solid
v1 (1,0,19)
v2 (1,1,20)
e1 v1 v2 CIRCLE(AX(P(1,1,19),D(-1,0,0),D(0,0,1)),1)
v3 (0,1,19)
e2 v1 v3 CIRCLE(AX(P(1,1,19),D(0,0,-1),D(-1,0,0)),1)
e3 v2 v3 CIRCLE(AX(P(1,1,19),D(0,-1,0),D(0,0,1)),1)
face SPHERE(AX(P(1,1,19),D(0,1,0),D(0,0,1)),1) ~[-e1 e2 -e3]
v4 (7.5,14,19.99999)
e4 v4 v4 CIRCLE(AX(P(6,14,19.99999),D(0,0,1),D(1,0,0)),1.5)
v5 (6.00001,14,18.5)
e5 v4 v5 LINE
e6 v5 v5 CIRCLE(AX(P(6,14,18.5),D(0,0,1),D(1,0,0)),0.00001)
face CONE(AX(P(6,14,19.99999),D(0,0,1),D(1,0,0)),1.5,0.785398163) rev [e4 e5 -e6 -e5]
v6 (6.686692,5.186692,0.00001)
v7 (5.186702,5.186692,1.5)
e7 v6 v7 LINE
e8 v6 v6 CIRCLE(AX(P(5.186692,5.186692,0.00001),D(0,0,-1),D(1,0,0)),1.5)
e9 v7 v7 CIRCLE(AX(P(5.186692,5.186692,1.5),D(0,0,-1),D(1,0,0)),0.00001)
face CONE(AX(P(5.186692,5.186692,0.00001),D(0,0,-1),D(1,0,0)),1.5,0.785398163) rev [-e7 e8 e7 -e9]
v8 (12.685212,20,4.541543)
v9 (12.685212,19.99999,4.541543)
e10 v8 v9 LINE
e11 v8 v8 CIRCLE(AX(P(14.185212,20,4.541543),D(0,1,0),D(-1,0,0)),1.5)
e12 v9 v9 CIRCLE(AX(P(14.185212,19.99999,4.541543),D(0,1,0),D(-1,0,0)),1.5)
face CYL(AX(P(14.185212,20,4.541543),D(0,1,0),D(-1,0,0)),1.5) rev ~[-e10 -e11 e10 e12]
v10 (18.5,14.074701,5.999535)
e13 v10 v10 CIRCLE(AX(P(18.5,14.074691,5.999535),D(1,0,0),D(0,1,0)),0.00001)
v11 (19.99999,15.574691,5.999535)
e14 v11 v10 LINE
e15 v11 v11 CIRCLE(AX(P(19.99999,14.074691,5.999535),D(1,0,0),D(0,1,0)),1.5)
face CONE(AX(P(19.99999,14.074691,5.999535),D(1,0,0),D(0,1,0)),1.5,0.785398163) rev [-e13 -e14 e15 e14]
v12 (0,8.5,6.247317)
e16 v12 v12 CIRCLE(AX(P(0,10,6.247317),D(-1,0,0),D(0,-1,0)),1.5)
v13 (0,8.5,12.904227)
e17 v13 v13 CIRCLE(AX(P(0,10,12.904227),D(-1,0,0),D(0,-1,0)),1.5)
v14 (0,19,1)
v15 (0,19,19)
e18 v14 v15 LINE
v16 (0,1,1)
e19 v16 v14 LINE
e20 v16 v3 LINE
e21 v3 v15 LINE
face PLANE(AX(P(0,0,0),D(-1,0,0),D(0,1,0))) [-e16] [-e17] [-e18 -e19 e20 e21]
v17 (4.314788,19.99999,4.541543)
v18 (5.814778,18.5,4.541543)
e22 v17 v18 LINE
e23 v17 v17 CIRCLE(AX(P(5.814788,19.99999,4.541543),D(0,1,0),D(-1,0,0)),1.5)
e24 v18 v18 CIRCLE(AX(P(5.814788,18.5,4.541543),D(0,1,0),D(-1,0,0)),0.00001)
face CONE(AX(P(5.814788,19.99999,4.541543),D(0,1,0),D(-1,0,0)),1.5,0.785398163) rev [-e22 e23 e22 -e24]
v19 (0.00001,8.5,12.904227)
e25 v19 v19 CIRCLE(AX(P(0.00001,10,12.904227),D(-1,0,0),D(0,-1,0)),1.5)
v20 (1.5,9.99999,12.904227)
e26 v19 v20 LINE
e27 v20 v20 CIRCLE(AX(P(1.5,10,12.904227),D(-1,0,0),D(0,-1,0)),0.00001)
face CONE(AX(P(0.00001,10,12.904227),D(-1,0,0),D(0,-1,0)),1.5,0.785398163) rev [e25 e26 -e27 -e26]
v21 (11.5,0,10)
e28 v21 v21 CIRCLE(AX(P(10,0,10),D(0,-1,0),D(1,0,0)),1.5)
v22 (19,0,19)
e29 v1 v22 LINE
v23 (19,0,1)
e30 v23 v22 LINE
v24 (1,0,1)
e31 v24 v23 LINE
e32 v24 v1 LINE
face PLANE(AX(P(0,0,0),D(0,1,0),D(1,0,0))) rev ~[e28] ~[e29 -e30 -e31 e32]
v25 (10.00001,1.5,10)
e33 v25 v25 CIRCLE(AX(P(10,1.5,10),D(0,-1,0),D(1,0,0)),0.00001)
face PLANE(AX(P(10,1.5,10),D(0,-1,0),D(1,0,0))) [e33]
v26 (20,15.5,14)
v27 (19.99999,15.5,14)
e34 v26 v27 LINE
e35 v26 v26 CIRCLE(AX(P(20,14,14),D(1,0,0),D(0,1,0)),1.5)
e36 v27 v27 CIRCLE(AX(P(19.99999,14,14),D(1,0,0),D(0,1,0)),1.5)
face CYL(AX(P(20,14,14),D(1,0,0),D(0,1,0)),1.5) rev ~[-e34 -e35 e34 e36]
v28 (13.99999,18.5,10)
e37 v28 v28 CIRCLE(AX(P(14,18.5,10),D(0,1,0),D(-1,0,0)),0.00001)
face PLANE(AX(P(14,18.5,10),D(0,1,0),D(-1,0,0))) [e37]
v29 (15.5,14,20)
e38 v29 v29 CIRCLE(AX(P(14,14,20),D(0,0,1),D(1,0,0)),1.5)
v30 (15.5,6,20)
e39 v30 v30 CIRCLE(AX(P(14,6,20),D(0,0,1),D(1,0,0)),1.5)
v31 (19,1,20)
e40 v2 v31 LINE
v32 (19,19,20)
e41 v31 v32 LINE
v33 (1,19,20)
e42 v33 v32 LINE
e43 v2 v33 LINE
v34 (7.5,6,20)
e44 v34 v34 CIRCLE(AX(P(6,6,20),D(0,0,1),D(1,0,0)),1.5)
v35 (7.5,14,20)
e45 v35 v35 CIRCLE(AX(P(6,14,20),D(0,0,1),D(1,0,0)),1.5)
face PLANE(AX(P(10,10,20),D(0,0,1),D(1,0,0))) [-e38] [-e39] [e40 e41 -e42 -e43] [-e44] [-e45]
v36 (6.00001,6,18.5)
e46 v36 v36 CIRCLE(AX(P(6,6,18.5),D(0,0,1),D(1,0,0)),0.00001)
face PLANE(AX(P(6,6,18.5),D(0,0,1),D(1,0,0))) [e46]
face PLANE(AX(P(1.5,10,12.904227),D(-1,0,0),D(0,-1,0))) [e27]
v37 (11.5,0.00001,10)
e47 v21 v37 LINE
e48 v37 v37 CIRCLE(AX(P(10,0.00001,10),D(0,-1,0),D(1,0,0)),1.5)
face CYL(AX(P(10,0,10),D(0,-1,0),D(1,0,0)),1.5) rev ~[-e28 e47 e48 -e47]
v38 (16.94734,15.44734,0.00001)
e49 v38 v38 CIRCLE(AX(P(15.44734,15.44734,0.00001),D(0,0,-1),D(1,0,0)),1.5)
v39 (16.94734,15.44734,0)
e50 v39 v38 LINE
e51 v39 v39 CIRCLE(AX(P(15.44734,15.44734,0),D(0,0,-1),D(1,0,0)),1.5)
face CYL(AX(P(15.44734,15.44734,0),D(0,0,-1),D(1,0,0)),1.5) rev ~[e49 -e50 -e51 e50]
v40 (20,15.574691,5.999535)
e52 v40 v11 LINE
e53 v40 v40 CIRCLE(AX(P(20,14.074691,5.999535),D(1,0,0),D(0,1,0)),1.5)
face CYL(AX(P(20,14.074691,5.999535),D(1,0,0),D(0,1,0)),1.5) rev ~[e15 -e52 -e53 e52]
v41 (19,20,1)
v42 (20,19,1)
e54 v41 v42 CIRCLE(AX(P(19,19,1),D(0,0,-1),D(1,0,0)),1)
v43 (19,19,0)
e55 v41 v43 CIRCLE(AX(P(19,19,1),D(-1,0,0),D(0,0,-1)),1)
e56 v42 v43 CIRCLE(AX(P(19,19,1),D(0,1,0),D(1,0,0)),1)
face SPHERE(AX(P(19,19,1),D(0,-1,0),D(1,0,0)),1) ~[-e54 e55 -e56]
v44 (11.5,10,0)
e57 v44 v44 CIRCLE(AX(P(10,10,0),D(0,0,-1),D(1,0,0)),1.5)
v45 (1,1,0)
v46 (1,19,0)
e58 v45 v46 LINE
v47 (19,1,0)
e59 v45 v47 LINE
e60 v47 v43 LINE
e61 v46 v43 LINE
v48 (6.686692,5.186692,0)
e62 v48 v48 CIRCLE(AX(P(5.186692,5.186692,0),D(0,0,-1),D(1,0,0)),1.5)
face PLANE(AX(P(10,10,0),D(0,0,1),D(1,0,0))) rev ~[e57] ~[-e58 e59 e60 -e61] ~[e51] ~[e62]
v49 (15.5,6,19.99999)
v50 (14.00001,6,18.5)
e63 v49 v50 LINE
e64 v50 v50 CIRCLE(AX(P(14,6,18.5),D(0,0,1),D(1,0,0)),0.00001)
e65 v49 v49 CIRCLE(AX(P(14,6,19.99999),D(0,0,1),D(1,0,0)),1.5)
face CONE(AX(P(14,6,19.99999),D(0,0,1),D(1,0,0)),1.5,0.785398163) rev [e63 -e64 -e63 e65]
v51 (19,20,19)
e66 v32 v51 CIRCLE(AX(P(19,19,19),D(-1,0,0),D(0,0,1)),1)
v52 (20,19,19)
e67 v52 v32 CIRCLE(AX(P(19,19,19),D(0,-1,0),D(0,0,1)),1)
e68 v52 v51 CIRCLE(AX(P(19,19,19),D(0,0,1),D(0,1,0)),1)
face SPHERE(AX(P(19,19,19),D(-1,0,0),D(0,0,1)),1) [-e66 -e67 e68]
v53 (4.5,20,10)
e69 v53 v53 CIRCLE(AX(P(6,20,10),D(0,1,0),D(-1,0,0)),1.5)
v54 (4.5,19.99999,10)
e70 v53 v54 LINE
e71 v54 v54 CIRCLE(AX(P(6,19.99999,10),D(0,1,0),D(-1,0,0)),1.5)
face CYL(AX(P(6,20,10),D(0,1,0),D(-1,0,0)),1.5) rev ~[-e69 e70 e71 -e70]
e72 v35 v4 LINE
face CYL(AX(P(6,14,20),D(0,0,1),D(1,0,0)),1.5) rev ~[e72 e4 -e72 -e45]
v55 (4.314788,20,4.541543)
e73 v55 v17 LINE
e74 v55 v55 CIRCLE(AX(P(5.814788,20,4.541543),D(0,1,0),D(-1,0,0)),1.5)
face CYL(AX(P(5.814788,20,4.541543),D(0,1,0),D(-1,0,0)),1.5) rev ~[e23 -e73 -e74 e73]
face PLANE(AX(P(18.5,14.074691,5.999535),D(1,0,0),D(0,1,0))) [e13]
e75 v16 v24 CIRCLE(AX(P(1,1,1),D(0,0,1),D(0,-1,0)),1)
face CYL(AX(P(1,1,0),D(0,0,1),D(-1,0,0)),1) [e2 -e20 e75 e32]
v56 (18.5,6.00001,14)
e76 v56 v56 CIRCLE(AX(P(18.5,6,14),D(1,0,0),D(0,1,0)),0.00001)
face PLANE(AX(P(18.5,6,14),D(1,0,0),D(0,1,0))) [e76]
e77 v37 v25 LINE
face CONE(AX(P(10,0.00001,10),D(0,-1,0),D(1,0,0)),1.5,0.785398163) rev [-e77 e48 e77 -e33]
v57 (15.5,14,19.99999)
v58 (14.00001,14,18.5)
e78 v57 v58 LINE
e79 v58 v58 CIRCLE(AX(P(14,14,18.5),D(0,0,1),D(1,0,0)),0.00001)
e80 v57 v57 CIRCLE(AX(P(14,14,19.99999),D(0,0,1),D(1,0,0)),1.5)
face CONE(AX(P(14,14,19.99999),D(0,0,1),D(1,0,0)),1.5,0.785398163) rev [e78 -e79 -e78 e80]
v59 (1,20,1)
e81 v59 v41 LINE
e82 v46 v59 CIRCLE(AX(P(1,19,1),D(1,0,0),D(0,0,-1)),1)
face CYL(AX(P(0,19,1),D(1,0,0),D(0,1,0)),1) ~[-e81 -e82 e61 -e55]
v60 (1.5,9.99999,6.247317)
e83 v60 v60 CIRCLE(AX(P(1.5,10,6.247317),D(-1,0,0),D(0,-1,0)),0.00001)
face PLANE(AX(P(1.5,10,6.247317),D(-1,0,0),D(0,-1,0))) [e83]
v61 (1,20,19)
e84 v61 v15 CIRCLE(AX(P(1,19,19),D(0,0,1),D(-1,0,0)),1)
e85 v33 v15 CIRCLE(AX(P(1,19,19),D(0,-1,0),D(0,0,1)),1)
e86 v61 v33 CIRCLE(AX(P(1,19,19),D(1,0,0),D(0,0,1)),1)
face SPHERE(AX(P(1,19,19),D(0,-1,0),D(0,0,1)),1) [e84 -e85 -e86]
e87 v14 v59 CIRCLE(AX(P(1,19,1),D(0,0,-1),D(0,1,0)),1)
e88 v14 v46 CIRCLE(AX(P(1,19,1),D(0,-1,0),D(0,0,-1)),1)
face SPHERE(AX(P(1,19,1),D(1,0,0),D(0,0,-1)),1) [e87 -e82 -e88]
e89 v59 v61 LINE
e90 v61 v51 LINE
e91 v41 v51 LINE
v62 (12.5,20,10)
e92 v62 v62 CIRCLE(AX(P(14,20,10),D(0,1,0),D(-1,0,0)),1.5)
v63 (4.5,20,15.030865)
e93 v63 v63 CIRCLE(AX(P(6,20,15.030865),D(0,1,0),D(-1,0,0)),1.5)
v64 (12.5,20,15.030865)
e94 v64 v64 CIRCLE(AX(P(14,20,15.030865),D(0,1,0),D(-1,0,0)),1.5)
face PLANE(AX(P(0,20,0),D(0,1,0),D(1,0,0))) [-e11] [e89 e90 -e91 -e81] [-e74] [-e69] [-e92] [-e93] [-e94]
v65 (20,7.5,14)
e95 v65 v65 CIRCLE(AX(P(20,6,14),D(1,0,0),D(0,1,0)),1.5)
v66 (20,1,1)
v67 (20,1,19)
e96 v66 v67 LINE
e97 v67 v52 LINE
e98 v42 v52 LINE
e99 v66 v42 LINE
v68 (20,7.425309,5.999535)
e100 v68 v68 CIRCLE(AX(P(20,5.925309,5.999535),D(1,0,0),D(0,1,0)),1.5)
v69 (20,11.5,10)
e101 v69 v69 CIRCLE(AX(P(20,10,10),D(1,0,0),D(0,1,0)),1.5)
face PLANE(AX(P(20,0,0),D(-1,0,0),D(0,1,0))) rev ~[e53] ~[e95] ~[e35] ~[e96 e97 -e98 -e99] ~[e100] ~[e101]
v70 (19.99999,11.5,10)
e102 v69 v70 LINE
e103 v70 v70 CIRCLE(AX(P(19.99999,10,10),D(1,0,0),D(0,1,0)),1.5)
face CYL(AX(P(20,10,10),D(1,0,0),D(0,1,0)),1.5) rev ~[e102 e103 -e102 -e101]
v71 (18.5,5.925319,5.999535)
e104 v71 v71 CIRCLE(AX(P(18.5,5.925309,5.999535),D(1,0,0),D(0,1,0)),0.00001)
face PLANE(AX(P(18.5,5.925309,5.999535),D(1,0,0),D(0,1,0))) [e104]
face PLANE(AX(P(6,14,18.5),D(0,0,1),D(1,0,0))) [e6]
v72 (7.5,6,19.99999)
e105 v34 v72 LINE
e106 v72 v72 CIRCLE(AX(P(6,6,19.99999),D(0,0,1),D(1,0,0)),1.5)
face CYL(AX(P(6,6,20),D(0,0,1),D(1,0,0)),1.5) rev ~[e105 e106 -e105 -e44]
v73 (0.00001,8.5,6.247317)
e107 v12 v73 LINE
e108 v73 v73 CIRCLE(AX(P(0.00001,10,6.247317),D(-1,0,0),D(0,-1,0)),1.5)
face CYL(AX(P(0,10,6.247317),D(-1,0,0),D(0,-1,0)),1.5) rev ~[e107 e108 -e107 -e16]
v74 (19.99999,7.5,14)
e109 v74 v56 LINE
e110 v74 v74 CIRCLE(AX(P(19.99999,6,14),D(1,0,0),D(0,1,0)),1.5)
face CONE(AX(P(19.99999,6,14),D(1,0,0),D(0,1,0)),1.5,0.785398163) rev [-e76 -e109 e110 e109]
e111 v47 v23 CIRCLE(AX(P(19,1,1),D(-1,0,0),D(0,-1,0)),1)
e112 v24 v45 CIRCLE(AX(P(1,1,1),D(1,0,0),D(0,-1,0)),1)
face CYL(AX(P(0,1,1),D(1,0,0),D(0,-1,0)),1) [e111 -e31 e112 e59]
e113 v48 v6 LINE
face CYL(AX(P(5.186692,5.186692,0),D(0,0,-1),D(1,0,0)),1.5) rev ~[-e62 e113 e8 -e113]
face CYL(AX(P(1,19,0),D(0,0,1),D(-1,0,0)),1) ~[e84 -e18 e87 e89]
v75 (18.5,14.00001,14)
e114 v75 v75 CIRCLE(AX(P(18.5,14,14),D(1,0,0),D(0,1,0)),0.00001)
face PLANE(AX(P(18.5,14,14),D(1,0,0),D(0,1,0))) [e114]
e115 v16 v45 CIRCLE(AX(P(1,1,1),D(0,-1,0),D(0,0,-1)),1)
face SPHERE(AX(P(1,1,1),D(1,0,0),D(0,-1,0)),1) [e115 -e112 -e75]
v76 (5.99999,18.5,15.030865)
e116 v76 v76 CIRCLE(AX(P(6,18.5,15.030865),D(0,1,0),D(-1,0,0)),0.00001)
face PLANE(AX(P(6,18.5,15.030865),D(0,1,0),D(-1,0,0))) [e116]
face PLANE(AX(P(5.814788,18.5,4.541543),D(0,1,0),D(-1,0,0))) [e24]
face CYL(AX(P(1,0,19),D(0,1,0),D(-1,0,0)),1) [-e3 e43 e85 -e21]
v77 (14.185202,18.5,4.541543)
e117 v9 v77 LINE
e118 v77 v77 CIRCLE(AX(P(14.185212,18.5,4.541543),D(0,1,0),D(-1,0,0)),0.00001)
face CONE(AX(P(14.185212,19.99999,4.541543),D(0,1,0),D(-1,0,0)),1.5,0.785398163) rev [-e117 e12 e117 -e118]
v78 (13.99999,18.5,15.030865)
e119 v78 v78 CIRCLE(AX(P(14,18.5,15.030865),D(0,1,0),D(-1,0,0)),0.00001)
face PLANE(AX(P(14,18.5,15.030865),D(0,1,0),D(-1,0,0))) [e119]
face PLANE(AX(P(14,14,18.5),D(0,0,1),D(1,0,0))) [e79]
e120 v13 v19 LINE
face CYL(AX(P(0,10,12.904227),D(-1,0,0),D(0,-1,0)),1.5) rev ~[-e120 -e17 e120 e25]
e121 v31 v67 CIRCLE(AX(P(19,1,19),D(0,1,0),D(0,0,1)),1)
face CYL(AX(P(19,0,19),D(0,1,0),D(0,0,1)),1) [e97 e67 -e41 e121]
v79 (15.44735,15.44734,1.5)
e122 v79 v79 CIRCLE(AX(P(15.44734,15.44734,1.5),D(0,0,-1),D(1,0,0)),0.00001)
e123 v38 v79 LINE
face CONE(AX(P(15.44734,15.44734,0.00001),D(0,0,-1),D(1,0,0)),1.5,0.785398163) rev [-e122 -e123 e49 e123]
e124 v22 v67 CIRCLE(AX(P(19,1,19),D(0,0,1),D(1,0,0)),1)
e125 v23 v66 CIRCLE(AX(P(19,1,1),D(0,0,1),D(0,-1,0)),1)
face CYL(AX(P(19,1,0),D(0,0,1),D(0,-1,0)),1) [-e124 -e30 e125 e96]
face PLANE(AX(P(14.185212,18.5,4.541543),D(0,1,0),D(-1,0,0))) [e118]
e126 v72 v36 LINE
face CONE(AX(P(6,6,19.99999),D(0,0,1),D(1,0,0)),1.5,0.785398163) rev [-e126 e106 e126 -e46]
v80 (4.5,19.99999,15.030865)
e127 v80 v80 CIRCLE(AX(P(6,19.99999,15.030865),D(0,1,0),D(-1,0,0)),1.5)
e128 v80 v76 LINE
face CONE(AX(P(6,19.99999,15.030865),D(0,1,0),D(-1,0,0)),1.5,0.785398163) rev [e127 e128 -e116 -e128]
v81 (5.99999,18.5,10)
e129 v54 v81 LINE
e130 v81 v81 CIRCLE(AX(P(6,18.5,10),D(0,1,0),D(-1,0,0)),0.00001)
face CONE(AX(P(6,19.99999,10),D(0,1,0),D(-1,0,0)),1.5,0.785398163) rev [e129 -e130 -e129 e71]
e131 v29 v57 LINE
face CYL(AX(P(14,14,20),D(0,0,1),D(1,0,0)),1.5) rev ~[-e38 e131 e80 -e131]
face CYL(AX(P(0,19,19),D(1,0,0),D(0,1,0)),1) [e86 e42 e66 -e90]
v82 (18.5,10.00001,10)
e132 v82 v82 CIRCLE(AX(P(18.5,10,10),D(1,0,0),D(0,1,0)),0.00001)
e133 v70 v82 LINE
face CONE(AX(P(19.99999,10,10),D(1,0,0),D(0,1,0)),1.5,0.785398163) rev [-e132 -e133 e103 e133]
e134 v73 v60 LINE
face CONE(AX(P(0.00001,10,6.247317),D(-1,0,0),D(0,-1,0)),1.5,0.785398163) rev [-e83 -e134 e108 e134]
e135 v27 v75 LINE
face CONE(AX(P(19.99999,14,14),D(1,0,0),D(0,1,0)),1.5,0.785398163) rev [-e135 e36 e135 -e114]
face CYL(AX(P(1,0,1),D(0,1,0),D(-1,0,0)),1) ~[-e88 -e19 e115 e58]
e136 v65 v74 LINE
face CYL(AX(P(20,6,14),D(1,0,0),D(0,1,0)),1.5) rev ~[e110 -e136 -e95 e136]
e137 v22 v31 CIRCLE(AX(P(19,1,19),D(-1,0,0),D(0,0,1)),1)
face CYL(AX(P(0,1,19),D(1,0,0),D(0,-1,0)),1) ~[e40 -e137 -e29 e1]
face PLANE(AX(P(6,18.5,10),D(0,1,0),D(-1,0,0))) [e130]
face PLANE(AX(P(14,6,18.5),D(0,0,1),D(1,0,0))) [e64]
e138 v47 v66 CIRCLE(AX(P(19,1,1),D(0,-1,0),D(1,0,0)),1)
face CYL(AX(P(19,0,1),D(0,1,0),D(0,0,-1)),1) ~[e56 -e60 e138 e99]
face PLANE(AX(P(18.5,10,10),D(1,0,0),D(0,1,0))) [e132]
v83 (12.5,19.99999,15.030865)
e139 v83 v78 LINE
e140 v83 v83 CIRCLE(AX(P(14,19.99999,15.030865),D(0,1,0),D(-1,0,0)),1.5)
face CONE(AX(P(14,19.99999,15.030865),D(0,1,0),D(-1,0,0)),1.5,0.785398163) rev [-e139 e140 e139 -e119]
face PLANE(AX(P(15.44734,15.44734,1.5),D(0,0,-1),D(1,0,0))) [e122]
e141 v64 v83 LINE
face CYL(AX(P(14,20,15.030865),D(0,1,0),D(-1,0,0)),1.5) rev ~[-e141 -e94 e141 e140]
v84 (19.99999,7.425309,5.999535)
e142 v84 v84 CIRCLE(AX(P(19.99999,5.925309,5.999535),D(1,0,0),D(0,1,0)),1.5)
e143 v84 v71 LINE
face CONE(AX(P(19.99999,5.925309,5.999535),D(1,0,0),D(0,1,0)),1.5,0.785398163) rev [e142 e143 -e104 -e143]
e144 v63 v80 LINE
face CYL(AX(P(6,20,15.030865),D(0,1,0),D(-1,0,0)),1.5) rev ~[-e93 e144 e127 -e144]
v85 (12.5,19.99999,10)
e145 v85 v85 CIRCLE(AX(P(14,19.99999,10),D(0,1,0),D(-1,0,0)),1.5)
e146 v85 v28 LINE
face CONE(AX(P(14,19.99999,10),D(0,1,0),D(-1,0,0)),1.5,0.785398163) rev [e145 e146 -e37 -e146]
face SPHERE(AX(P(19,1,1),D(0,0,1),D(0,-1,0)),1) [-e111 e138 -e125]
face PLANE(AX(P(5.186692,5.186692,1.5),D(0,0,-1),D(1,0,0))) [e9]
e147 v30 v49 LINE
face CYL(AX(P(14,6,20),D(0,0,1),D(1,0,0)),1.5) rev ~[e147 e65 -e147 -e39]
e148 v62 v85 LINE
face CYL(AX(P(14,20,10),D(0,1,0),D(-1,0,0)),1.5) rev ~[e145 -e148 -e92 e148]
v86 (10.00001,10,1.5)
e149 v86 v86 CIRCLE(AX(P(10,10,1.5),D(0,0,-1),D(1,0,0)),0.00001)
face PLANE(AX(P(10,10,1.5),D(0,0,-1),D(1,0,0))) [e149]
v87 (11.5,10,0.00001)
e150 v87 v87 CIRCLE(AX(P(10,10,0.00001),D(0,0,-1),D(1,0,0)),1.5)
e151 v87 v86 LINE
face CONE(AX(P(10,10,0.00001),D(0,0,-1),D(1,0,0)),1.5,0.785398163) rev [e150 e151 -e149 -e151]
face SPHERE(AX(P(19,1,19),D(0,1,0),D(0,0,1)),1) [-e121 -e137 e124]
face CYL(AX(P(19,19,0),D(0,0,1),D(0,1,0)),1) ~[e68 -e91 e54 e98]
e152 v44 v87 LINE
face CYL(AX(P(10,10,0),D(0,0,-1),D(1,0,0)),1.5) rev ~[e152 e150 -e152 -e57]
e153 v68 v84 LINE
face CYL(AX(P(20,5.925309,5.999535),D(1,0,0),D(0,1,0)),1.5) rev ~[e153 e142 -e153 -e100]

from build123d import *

# Parameters (mm, degrees)
F0_W      = 20
F0_H      = 20
F1_DEPTH  = 20
F2_R      = 1.5
F3_DEPTH  = 1.5
F4_R      = 1
F5_R      = 1.5
F6_DEPTH  = 1.5
F7_R      = 1.5
F8_DEPTH  = 1.5
F9_R      = 1.5
F10_DEPTH = 1.5
F11_R     = 1.5
F12_DEPTH = 1.5
F13_R     = 1.5
F14_DEPTH = 1.5
F15_SIZE  = 1.49999


# Not quite as in the source:
# - a fillet or chamfer is up to 0.001 mm smaller than in the source, because OpenCascade refuses the exact size


with BuildPart() as f1:
    # F0 (on Top) → F1 (new body)
    with BuildSketch(Plane.XY):
        with Locations((10, 10)):
            Rectangle(F0_W, F0_H)
    extrude(amount=F1_DEPTH)

    # F2 (on face) → F3 (cut)
    with BuildSketch(Plane.XZ):
        with Locations((10, 10)):
            Circle(F2_R)
    extrude(amount=-F3_DEPTH, mode=Mode.SUBTRACT)

    # F4
    f4_edges = [f1.edges().sort_by_distance(p)[0] for p in [
        (0, 10, 20),
        (10, 20, 20),
        (20, 10, 20),
        (10, 0, 20),
        (20, 0, 10),
        (10, 0, 0),
        (0, 0, 10),
        (20, 10, 0),
        (20, 20, 10),
        (10, 20, 0),
        (0, 10, 0),
        (0, 20, 10),
    ]]
    fillet(f4_edges, radius=F4_R)

    # F5 (on face) → F6 (cut)
    with BuildSketch(Plane.XY.offset(20)):
        with Locations((6, 14)):
            Circle(F5_R)
        with Locations((6, 6)):
            Circle(F5_R)
        with Locations((14, 6)):
            Circle(F5_R)
        with Locations((14, 14)):
            Circle(F5_R)
    extrude(amount=-F6_DEPTH, mode=Mode.SUBTRACT)

    # F7 (on face) → F8 (cut)
    with BuildSketch(Plane.YZ.offset(20)):
        with Locations((6, 14)):
            Circle(F7_R)
        with Locations((5.9253086879, 5.9995350826)):
            Circle(F7_R)
        with Locations((10, 10)):
            Circle(F7_R)
        with Locations((14, 14)):
            Circle(F7_R)
        with Locations((14.0746913121, 5.9995350826)):
            Circle(F7_R)
    extrude(amount=-F8_DEPTH, mode=Mode.SUBTRACT)

    # F9 (on face) → F10 (cut)
    with BuildSketch(Plane(origin=(0, 0, 0), x_dir=(1, 0, 0), z_dir=(0, 0, -1))):
        with Locations((5.1866916474, -5.1866916474)):
            Circle(F9_R)
        with Locations((10, -10)):
            Circle(F9_R)
        with Locations((15.44734044, -15.44734044)):
            Circle(F9_R)
    extrude(amount=-F10_DEPTH, mode=Mode.SUBTRACT)

    # F11 (on face) → F12 (cut)
    with BuildSketch(Plane(origin=(0, 20, 0), x_dir=(-1, 0, 0), z_dir=(0, 1, 0))):
        with Locations((-14, 15.0308646262)):
            Circle(F11_R)
        with Locations((-14, 10)):
            Circle(F11_R)
        with Locations((-14.1852116212, 4.5415428467)):
            Circle(F11_R)
        with Locations((-5.8147883788, 4.5415428467)):
            Circle(F11_R)
        with Locations((-6, 10)):
            Circle(F11_R)
        with Locations((-6, 15.0308646262)):
            Circle(F11_R)
    extrude(amount=-F12_DEPTH, mode=Mode.SUBTRACT)

    # F13 (on face) → F14 (cut)
    with BuildSketch(Plane(origin=(0, 0, 0), x_dir=(0, -1, 0), z_dir=(-1, 0, 0))):
        with Locations((-10, 6.2473174185)):
            Circle(F13_R)
        with Locations((-10, 12.9042267799)):
            Circle(F13_R)
    extrude(amount=-F14_DEPTH, mode=Mode.SUBTRACT)

    # F15 (size 1.5 in the source; OpenCascade refuses exactly that, so slightly less here)
    f15_edges = [f1.edges().sort_by_distance(p)[0] for p in [
        (12.5, 14, 18.5),
        (12.5, 6, 18.5),
        (4.5, 6, 18.5),
        (4.5, 14, 18.5),
        (8.5, 1.5, 10),
        (18.5, 8.5, 10),
        (18.5, 4.5, 14),
        (18.5, 12.5, 14),
        (18.5, 12.574691, 5.999535),
        (18.5, 4.425309, 5.999535),
        (3.686692, 5.186692, 1.5),
        (8.5, 10, 1.5),
        (13.94734, 15.44734, 1.5),
        (15.5, 18.5, 15.030865),
        (7.5, 18.5, 15.030865),
        (15.5, 18.5, 10),
        (7.5, 18.5, 10),
        (15.685212, 18.5, 4.541543),
        (7.314788, 18.5, 4.541543),
        (1.5, 11.5, 6.247317),
        (1.5, 11.5, 12.904227),
    ]]
    chamfer(f15_edges, length=F15_SIZE)


solid = f1.part
